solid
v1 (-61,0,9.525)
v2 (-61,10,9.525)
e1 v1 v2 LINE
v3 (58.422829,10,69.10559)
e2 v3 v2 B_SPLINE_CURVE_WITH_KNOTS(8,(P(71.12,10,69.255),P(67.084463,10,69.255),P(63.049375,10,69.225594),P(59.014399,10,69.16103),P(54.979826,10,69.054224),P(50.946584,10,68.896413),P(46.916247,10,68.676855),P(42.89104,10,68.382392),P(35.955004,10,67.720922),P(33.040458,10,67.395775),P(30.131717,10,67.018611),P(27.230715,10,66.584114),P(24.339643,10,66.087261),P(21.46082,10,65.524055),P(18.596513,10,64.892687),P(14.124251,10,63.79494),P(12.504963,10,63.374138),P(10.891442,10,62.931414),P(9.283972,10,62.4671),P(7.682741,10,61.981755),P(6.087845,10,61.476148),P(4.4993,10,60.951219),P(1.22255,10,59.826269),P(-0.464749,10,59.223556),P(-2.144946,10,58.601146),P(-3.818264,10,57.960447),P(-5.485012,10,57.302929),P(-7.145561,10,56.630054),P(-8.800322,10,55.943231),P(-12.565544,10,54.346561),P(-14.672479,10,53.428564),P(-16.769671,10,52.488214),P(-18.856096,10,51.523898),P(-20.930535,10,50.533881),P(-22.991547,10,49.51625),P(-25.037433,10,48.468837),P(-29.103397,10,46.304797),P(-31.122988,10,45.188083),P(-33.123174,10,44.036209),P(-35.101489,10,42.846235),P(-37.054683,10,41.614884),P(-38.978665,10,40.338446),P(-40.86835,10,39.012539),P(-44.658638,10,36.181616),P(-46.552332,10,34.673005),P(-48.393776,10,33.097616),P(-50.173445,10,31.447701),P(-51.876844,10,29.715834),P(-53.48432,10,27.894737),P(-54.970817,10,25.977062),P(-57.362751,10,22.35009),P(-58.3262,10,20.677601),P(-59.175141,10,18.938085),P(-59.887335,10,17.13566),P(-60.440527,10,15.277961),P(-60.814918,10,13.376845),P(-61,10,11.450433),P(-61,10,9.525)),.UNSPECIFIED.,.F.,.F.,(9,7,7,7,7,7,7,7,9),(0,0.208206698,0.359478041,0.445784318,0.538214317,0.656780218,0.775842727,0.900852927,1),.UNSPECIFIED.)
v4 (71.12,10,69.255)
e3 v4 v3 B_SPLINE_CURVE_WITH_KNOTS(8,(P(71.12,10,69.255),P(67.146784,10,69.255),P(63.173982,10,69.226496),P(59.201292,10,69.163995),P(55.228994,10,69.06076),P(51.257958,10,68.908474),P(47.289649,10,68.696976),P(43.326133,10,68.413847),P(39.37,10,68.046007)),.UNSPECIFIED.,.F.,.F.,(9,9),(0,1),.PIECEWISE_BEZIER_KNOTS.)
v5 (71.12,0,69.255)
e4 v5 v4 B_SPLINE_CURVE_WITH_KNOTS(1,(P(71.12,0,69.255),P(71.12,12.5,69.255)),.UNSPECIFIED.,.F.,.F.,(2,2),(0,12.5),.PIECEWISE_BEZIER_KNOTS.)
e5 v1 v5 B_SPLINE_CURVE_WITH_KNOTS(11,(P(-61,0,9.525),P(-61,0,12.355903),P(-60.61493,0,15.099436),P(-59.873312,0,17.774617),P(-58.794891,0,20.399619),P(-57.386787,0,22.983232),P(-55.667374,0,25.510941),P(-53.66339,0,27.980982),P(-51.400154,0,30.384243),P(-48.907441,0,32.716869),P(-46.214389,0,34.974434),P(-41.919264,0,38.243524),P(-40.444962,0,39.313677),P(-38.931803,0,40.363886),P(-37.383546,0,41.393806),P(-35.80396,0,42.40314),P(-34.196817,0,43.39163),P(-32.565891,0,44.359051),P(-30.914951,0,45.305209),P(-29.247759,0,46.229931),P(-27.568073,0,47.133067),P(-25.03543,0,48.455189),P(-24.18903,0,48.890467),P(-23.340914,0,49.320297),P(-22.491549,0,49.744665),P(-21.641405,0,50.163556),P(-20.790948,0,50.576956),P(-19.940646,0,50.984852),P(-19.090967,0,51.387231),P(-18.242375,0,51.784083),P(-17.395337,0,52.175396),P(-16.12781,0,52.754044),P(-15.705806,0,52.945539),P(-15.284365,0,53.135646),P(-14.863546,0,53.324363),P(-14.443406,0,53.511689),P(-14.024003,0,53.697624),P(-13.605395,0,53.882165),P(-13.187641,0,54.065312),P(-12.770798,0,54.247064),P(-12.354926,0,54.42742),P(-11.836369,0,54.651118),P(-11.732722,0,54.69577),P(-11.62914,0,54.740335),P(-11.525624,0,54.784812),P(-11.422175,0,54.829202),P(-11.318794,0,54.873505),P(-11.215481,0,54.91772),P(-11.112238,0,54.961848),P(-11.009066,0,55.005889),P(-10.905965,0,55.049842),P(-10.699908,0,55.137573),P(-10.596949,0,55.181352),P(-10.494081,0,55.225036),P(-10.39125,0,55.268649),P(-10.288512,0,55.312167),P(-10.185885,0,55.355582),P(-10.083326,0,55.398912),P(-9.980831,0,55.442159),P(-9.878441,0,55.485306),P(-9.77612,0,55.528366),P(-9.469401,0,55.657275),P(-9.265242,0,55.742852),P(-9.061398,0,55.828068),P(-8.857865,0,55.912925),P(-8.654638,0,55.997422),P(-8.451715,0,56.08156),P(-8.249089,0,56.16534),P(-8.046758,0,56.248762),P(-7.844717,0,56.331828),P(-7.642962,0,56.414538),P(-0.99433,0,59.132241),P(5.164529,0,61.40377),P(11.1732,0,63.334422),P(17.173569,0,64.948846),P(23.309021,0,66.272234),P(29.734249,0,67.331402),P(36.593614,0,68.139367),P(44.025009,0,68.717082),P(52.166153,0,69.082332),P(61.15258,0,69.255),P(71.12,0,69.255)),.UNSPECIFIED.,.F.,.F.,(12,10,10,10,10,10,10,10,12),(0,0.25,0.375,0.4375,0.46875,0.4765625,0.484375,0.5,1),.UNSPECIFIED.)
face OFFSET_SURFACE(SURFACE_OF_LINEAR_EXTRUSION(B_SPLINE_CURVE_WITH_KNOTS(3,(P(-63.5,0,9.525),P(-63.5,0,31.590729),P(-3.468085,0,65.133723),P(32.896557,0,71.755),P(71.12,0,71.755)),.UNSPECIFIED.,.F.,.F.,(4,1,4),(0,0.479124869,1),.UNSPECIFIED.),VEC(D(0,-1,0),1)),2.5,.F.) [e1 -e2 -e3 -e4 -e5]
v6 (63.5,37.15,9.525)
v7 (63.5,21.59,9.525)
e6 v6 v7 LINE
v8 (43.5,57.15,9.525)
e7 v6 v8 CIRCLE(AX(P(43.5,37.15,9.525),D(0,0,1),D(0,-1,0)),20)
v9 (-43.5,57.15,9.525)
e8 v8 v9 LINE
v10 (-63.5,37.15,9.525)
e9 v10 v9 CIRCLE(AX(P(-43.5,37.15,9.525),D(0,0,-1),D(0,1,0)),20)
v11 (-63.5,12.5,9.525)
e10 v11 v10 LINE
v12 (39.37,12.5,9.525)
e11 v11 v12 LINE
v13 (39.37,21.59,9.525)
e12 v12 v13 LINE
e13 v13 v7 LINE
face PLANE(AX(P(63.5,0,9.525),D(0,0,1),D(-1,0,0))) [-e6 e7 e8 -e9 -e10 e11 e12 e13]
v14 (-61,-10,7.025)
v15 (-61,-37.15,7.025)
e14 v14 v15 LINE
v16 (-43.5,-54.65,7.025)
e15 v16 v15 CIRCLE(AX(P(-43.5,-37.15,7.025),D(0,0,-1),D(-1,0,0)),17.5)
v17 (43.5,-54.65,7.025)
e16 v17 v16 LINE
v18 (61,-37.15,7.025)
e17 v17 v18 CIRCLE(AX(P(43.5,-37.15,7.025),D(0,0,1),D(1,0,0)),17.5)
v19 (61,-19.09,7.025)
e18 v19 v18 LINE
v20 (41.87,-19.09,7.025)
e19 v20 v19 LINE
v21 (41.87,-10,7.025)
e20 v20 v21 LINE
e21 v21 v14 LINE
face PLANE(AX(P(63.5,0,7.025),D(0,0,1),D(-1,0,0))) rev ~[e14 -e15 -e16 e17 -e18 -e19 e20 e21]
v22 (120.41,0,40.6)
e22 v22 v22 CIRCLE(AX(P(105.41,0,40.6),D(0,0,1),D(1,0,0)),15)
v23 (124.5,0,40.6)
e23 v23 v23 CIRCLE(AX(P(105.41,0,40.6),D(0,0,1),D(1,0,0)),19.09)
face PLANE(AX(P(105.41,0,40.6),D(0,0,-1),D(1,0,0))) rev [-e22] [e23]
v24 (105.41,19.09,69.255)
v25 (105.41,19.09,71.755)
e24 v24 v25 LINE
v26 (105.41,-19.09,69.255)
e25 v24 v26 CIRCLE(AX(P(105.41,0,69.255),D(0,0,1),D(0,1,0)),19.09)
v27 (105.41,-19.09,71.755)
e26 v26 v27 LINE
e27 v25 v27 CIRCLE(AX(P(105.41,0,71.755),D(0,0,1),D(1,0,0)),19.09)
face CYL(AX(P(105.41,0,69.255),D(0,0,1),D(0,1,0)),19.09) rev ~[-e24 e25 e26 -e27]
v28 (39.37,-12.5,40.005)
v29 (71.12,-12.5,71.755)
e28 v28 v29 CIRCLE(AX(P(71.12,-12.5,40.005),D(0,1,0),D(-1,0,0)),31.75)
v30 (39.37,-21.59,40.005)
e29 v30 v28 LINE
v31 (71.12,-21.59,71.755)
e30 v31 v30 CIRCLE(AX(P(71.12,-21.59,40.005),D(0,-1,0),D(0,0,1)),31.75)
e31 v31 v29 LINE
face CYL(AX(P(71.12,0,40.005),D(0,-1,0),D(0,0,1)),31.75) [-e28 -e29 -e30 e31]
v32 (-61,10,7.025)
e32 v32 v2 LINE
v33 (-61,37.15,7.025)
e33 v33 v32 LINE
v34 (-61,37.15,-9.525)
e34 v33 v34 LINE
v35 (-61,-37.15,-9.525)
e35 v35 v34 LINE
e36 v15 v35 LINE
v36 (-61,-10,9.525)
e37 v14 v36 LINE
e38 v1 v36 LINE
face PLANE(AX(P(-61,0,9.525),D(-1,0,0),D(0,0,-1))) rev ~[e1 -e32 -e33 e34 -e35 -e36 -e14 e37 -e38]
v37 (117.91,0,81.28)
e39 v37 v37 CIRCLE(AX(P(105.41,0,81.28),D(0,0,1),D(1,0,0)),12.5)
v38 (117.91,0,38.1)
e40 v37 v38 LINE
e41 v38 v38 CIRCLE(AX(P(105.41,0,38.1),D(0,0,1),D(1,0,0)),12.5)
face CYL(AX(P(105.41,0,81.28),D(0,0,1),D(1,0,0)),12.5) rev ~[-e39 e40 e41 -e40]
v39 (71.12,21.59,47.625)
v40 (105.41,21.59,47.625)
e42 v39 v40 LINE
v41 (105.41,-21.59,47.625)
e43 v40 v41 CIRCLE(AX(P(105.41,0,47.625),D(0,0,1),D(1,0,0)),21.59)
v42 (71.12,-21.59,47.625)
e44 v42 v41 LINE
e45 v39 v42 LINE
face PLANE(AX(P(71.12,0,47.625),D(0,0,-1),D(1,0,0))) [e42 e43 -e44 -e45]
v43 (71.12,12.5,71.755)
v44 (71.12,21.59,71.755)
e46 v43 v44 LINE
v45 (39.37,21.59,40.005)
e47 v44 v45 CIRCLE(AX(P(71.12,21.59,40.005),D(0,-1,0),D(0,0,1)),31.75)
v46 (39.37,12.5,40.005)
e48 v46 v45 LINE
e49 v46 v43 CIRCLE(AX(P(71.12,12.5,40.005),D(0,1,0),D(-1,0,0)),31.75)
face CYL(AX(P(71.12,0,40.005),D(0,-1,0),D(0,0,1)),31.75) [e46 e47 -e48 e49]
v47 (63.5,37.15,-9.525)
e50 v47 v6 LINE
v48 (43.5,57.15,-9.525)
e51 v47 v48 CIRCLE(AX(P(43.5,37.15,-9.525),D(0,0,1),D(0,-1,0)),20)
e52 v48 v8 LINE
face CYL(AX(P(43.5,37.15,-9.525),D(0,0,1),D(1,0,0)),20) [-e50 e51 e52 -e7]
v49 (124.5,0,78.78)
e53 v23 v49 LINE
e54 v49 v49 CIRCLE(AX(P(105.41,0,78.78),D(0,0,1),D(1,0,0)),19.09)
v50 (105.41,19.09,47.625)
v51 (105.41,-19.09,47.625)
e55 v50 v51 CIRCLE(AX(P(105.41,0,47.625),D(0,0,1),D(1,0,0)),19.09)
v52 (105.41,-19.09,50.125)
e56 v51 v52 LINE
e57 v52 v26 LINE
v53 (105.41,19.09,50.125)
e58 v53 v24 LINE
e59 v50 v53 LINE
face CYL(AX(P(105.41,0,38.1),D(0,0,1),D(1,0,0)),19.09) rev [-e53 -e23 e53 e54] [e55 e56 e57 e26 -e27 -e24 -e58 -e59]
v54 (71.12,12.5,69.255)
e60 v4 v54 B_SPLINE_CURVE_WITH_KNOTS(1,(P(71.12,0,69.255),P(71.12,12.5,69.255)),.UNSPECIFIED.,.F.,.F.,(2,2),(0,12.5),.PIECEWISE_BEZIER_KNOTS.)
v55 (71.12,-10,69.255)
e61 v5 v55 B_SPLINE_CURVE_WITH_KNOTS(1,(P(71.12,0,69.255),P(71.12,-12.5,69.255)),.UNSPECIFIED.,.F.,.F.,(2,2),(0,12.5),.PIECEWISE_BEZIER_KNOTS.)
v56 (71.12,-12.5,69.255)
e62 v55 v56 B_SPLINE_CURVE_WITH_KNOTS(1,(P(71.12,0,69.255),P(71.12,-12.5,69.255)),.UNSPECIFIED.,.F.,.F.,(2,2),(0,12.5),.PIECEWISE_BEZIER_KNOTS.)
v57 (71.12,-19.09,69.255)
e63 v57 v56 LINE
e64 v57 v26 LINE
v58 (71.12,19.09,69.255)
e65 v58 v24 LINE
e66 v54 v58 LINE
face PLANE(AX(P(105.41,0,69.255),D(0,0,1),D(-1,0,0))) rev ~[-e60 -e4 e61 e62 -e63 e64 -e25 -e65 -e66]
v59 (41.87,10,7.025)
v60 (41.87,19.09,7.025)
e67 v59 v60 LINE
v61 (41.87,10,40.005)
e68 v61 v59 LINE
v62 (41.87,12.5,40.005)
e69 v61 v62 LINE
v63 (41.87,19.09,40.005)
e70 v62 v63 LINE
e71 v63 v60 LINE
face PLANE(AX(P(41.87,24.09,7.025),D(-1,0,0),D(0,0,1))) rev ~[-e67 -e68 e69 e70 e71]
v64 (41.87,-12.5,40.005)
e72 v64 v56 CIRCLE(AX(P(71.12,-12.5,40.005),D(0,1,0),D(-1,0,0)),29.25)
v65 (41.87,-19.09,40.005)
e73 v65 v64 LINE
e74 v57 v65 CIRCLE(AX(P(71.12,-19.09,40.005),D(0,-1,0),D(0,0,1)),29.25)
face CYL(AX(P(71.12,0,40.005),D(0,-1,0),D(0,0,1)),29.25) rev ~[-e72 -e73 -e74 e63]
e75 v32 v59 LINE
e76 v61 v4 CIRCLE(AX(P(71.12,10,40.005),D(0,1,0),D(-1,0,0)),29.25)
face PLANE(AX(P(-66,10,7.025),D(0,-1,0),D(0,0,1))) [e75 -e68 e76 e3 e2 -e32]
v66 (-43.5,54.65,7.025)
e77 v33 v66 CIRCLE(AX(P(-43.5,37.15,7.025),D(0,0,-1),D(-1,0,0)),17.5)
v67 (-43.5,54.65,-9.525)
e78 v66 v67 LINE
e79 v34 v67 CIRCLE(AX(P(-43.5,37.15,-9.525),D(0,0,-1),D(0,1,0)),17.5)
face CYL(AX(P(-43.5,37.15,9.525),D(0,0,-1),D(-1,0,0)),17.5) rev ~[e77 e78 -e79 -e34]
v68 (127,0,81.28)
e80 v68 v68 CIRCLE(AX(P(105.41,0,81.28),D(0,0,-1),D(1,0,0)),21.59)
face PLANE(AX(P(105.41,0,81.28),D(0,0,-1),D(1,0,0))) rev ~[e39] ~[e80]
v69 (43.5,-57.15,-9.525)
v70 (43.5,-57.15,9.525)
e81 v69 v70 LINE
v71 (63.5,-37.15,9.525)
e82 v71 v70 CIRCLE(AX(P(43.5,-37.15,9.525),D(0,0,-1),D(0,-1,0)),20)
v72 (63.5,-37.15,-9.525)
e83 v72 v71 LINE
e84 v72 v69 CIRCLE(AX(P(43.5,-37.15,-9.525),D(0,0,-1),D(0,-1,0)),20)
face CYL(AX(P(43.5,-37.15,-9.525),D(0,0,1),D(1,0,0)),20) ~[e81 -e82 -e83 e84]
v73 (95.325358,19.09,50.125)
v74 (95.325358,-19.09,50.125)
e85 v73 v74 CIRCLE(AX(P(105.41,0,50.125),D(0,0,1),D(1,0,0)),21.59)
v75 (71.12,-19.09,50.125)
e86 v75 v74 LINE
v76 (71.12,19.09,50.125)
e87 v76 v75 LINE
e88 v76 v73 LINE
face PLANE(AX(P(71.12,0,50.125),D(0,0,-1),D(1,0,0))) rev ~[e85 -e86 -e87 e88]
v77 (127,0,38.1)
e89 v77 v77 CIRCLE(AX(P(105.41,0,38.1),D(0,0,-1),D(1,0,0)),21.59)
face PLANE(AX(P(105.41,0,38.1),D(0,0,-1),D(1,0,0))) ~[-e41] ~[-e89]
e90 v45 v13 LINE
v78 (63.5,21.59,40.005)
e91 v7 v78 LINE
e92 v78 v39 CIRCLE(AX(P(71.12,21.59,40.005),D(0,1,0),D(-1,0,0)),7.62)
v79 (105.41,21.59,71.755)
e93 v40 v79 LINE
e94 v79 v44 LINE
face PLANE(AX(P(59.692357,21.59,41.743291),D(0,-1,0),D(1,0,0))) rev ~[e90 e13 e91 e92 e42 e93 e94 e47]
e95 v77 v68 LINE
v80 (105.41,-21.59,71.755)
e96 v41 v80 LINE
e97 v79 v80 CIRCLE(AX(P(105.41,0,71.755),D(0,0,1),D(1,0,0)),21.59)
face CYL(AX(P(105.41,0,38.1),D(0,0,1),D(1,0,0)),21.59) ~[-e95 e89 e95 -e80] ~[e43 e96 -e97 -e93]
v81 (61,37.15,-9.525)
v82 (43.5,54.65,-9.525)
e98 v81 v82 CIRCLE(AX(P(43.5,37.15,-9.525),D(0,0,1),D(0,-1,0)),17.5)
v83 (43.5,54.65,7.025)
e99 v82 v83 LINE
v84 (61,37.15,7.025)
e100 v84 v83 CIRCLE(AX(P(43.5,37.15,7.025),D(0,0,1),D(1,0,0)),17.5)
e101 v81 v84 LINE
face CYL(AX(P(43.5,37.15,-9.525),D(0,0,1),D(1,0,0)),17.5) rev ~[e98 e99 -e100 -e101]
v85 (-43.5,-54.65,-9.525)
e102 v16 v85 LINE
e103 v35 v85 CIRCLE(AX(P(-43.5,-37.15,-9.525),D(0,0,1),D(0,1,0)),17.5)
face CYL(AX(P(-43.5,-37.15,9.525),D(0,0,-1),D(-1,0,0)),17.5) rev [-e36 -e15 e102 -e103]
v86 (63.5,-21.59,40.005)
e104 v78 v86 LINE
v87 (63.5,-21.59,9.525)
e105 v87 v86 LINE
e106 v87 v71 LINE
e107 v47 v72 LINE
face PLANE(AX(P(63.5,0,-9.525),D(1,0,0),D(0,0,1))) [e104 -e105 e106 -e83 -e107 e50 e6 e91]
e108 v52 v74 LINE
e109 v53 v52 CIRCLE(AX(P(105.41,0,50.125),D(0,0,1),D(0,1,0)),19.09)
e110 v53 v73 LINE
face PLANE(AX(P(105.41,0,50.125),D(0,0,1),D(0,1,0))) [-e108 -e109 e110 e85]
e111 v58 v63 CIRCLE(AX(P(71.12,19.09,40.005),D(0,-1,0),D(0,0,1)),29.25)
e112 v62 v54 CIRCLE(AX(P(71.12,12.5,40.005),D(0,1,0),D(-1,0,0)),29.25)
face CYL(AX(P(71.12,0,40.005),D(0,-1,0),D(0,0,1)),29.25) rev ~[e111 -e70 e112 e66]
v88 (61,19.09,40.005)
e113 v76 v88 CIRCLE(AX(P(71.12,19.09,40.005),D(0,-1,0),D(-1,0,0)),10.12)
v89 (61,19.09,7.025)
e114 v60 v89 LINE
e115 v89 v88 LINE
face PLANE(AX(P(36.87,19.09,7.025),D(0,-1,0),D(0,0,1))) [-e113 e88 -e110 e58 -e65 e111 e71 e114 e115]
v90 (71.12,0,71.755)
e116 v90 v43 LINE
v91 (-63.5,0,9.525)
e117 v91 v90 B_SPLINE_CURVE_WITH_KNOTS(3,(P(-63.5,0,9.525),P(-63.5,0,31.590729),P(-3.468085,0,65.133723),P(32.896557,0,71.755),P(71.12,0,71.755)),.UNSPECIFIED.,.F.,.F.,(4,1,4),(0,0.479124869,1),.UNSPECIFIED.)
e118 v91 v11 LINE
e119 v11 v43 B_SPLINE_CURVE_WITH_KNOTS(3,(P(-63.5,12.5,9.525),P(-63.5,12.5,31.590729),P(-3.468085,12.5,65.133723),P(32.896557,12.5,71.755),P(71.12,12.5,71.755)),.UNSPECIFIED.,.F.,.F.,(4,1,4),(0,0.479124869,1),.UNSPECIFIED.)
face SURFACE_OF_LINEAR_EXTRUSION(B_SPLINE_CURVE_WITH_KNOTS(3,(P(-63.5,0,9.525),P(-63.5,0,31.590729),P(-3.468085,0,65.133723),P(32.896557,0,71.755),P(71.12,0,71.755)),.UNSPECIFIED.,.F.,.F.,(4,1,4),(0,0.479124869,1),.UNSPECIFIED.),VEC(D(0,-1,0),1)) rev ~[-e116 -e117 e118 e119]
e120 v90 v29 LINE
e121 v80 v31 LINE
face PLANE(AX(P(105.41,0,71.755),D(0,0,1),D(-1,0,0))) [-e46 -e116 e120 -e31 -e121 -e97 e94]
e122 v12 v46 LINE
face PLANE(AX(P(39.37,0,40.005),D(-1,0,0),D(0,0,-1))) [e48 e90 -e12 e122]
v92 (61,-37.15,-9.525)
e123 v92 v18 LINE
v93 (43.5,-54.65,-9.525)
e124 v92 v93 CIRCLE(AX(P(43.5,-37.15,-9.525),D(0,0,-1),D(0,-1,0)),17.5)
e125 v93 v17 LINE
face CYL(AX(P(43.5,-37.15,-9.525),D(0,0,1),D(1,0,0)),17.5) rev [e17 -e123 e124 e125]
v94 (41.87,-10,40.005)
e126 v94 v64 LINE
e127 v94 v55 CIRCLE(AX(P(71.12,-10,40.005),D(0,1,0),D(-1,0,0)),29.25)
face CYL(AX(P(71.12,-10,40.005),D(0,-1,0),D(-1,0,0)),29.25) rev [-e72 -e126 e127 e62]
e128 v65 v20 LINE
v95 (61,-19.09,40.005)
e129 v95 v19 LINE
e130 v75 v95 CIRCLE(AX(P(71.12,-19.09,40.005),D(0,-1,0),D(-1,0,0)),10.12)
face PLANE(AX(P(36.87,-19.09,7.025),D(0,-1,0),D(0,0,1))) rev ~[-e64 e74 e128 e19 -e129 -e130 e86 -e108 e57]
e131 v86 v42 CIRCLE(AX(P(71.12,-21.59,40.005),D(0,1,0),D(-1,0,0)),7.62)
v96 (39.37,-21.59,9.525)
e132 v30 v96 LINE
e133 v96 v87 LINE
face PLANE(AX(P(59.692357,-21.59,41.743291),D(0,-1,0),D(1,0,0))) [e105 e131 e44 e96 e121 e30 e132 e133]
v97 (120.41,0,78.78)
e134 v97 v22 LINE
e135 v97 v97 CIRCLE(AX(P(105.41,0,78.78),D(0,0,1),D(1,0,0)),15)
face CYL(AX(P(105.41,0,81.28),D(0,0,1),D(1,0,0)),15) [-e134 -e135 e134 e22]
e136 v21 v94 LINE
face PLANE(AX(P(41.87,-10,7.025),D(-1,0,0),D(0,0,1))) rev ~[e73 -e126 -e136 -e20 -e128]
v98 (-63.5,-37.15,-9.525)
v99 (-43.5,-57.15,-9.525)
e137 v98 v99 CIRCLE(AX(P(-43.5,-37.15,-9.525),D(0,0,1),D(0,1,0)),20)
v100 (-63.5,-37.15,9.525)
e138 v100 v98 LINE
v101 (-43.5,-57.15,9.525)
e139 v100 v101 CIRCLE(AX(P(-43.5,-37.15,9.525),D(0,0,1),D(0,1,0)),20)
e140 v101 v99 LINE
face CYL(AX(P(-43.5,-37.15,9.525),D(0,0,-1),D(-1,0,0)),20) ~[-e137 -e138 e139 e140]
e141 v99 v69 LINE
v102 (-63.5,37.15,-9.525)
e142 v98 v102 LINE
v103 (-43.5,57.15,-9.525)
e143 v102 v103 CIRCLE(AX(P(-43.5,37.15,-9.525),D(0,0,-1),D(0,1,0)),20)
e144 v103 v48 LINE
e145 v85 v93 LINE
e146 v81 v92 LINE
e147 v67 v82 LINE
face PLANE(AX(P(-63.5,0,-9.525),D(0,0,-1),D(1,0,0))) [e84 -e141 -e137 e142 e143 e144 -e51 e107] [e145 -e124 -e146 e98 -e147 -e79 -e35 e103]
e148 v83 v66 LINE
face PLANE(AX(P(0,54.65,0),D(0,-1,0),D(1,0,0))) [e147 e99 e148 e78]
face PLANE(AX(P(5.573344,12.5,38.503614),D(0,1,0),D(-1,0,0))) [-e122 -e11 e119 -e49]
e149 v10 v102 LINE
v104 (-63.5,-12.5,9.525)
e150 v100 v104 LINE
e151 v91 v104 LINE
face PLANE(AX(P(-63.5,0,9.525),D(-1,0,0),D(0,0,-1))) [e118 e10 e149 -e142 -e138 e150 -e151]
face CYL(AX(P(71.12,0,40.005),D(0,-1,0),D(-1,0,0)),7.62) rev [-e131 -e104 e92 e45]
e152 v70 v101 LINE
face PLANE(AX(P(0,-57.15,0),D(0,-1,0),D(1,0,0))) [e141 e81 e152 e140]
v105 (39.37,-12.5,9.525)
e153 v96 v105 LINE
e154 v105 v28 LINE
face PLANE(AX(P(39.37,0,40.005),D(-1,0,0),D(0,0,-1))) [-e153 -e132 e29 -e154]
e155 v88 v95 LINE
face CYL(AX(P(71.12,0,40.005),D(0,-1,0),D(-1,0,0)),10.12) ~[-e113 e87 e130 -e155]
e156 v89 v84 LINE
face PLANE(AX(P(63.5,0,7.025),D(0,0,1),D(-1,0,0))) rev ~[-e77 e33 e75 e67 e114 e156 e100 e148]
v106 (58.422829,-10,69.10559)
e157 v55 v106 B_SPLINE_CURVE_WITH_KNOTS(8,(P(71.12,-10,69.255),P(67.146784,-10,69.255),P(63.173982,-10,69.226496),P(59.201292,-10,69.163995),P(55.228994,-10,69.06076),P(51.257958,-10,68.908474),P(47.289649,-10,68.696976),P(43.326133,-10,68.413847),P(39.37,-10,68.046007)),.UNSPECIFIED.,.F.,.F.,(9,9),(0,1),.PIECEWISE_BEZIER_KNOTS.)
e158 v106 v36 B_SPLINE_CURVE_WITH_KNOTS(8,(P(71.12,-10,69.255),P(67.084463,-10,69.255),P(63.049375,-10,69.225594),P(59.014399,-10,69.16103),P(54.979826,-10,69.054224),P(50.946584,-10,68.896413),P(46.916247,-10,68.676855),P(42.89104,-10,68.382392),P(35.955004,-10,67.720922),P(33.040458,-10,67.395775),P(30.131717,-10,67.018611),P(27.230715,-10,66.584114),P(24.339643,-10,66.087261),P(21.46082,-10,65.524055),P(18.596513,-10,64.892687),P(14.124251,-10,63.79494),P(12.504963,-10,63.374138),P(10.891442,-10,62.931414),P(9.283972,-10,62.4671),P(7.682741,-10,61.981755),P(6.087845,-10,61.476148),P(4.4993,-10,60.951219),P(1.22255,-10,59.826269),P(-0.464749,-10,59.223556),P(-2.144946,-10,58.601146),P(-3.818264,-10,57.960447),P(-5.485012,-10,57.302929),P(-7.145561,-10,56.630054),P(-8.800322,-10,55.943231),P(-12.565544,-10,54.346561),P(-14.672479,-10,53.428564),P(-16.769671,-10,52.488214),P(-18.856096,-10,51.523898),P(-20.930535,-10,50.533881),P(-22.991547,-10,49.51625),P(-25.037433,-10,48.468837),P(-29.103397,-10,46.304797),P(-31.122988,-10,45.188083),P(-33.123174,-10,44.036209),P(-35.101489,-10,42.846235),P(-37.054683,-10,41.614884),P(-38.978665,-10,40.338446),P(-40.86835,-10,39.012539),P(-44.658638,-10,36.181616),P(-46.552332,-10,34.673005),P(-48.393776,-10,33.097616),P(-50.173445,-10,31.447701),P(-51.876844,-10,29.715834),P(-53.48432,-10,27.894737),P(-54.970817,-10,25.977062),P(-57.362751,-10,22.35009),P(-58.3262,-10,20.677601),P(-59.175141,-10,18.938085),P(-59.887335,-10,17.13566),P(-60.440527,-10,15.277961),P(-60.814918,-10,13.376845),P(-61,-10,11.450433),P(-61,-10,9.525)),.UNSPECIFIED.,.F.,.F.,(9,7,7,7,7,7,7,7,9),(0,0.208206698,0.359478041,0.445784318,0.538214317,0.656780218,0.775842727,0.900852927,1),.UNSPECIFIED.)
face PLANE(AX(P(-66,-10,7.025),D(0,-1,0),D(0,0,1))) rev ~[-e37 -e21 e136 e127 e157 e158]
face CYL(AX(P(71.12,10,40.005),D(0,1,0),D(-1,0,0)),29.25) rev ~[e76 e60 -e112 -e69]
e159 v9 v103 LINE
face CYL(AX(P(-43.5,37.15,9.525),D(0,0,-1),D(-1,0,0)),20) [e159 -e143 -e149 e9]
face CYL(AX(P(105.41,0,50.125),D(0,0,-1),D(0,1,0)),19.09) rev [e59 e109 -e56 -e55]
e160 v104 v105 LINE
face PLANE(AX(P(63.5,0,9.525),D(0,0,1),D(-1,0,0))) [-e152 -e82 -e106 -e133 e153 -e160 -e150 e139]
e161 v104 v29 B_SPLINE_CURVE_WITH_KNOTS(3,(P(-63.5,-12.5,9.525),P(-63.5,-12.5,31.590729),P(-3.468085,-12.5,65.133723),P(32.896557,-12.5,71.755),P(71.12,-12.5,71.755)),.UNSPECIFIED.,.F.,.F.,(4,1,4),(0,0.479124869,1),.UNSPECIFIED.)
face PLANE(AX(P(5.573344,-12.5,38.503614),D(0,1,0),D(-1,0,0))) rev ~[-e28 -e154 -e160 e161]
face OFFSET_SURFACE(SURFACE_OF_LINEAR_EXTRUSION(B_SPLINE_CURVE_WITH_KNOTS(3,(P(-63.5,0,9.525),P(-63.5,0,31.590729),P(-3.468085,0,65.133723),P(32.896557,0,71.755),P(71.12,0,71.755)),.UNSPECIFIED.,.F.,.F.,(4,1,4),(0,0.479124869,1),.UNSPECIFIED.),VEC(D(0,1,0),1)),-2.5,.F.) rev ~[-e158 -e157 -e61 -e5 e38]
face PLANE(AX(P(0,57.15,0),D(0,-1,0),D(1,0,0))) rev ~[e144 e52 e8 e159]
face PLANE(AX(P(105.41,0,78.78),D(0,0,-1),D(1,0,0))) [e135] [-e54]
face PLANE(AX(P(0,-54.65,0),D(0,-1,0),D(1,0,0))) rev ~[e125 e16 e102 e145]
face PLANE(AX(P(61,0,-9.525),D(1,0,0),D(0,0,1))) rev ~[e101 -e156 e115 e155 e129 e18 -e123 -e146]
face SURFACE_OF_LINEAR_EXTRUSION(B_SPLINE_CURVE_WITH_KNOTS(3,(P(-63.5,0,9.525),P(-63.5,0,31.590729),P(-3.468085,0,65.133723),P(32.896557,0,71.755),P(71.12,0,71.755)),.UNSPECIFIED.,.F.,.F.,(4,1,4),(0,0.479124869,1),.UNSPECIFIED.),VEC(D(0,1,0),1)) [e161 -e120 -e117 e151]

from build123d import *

# Parameters (mm, degrees)
F1_DEPTH     = 57.15
F0_W         = 21.59
F0_H         = 24.13
F2_DEPTH     = 21.59
F3_DEPTH     = 12.5
F5_R         = 12.5
F6_DEPTH     = 90.806
F7_R         = 20
F8_T         = 2.5
F8_T3_DEPTH  = 107.87
F8_T5_DEPTH  = 14.09
F8_T7_DEPTH  = 29.13
F8_T9_DEPTH  = 14.09
F8_T11_DEPTH = 35.48
F8_T14_ANGLE = 90.000000001
F8_T16_ANGLE = 90.000000001
F8_T18_ANGLE = 180.000000001
F8_T20_ANGLE = 180.000000001


# Not quite as in the source:
# - a shell that OpenCascade refuses in one call is made with other operations: the cavity is built on its own and cut out


with BuildPart() as f1:
    # F0 (on Front) → F1 (new body, symmetric)
    with BuildSketch(Plane.XZ):
        Polygon((-63.5, -9.525), (63.5, -9.525), (63.5, 9.525), (39.37, 9.525), (-63.5, 9.525), align=None)
    extrude(amount=F1_DEPTH, both=True)

    # F0 (on Front) → F2 (join, symmetric)
    with BuildSketch(Plane.XZ):
        with BuildLine():
            Line((39.37, 9.525), (63.5, 9.525))
            Line((63.5, 9.525), (63.5, 40.005))
            ThreePointArc((63.5, 40.005), (65.7318463274, 45.3931536726), (71.12, 47.625))
            Line((71.12, 47.625), (83.82, 47.625))
            Line((83.82, 47.625), (83.82, 71.755))
            Line((83.82, 71.755), (71.12, 71.755))
            ThreePointArc((71.12, 71.755), (48.6693596973, 62.4556403027), (39.37, 40.005))
            Line((39.37, 40.005), (39.37, 9.525))
        make_face()
        with Locations((94.615, 59.69)):
            Rectangle(F0_W, F0_H)
    extrude(amount=F2_DEPTH, both=True)

    # F0 (on Front) → F3 (join, symmetric)
    with BuildSketch(Plane.XZ):
        with BuildLine():
            add(Edge.make_bspline(
                [(-63.5, 9.525), (-63.5, 31.5907289062), (-3.4680848518, 65.1337229979), (32.8965573805, 71.755), (71.12, 71.755)],
                knots=[0, 0, 0, 0, 0.4791248693, 1, 1, 1, 1], degree=3))
            Line((-63.5, 9.525), (39.37, 9.525))
            Line((39.37, 9.525), (39.37, 40.005))
            ThreePointArc((39.37, 40.005), (48.6693596973, 62.4556403027), (71.12, 71.755))
        make_face()
    extrude(amount=F3_DEPTH, both=True)

    # F0 (on Front) → F4 (revolve)
    with BuildSketch(Plane.XZ):
        Polygon((105.41, 81.28), (105.41, 71.755), (105.41, 47.625), (105.41, 38.1), (127, 38.1), (127, 81.28), align=None)
    revolve(axis=Axis((105.41, 0, 59.69), (0, 0, -1)))

    # F5 (on face) → F6 (cut, through all)
    with BuildSketch(Plane.XY.offset(81.28)):
        with Locations((105.41, 0)):
            Circle(F5_R)
    extrude(amount=-F6_DEPTH, mode=Mode.SUBTRACT)

    # F7
    f7_edges = [f1.edges().sort_by_distance(p)[0] for p in [
        (63.5, -57.15, 0),
        (-63.5, -57.15, 0),
        (63.5, 57.15, 0),
        (-63.5, 57.15, 0),
    ]]
    fillet(f7_edges, radius=F7_R)

    # F8: shell of thickness 2.5, made by hand


with BuildPart() as f8_core1:
    # F8_t2: copy of F1
    add(f1.part)

    # the walls: a layer under each face that stays
    f8_faces = [f8_core1.faces().sort_by_distance(p)[0] for p in [
        (0, 57.15, 0),
        (-57.6421356237, 51.2921356237, 0),
        (57.6421356237, 51.2921356237, 0),
        (-63.5, 0, 0),
        (63.5, 0, 15.24),
        (-57.6421356237, -51.2921356237, 0),
        (57.6421356237, -51.2921356237, 0),
        (0, -57.15, 0),
        (0, 34.825, 9.525),
        (0, -34.825, 9.525),
        (-8.3874166975, -6.25, 58.8110273922),
        (-8.3874166975, 6.25, 58.8110273922),
        (50.3766666667, 21.59, 19.8966666667),
        (50.3766666667, -21.59, 19.8966666667),
        (65.7318463274, 0, 45.3931536726),
        (3.81, 12.5, 40.64),
        (39.37, 17.045, 24.765),
        (3.81, -12.5, 40.64),
        (39.37, -17.045, 24.765),
        (88.265, 14.3933333333, 71.755),
        (76.835, 14.3933333333, 47.625),
        (116.205, -18.6974884677, 45.2966666667),
        (48.6693596973, 17.045, 62.4556403027),
        (48.6693596973, -17.045, 62.4556403027),
        (91.0166666667, 14.3933333333, 81.28),
        (119.8033333333, 14.3933333333, 38.1),
        (92.91, 0, 59.69),
    ]]
    thicken(f8_faces, amount=-F8_T, mode=Mode.SUBTRACT)

    # F8_s4 → F8_t3 (cut)
    with BuildSketch(Plane.YZ.offset(-66)):
        Polygon((12.525, 9.55), (12.5, 7.025), (10, 7.025), (10, 9.525), align=None)
        Polygon((-12.525, 9.55), (-12.5, 7.025), (-10, 7.025), (-10, 9.525), align=None)
    extrude(amount=F8_T3_DEPTH, mode=Mode.SUBTRACT)

    # F8_s6 → F8_t5 (cut)
    with BuildSketch(Plane.XZ.offset(-24.09)):
        Polygon((39.345, 9.55), (39.37, 7.025), (41.87, 7.025), (41.87, 9.525), align=None)
    extrude(amount=F8_T5_DEPTH, mode=Mode.SUBTRACT)

    # F8_s8 → F8_t7 (cut)
    with BuildSketch(Plane.YZ.offset(36.87)):
        Polygon((21.615, 9.55), (21.59, 7.025), (19.09, 7.025), (19.09, 9.525), align=None)
        Polygon((-21.615, 9.55), (-21.59, 7.025), (-19.09, 7.025), (-19.09, 9.525), align=None)
    extrude(amount=F8_T7_DEPTH, mode=Mode.SUBTRACT)

    # F8_s10 → F8_t9 (cut)
    with BuildSketch(Plane.XZ.offset(10)):
        Polygon((39.345, 9.55), (39.37, 7.025), (41.87, 7.025), (41.87, 9.525), align=None)
    extrude(amount=F8_T9_DEPTH, mode=Mode.SUBTRACT)

    # F8_s12 → F8_t11 (cut)
    with BuildSketch(Plane.XY.offset(7.025)):
        Polygon((39.345, 12.525), (39.37, 10), (41.87, 10), (41.87, 12.5), align=None)
        Polygon((39.345, -12.525), (39.37, -10), (41.87, -10), (41.87, -12.5), align=None)
    extrude(amount=F8_T11_DEPTH, mode=Mode.SUBTRACT)

    # F8_s13 → F8_t14 (revolve, cut)
    with BuildSketch(Plane.XY.offset(40.005)):
        Polygon((39.345, 12.525), (39.37, 10), (41.87, 10), (41.87, 12.5), align=None)
    revolve(axis=Axis((71.12, 12.5, 40.005), (0, 1, 0)), revolution_arc=F8_T14_ANGLE, mode=Mode.SUBTRACT)

    # F8_s15 → F8_t16 (revolve, cut)
    with BuildSketch(Plane.XY.offset(40.005)):
        Polygon((39.345, -12.525), (39.37, -10), (41.87, -10), (41.87, -12.5), align=None)
    revolve(axis=Axis((71.12, -12.5, 40.005), (0, 1, 0)), revolution_arc=F8_T16_ANGLE, mode=Mode.SUBTRACT)

    # F8_s17 → F8_t18 (revolve, cut)
    with BuildSketch(Plane.YZ.offset(105.41)):
        Polygon((21.615, 71.78), (21.59, 69.255), (19.09, 69.255), (19.09, 71.755), align=None)
    revolve(axis=Axis((105.41, 0, 71.755), (0, 0, 1)), revolution_arc=F8_T18_ANGLE, mode=Mode.SUBTRACT)

    # F8_s19 → F8_t20 (revolve, cut)
    with BuildSketch(Plane.YZ.offset(105.41)):
        Polygon((21.615, 47.6), (21.59, 50.125), (19.09, 50.125), (19.09, 47.625), align=None)
    revolve(axis=Axis((105.41, 0, 47.625), (0, 0, 1)), revolution_arc=F8_T20_ANGLE, mode=Mode.SUBTRACT)


with BuildPart() as f1_1:
    add(f1.part)

    # what is left inside the walls is the cavity
    f8_cavity = [f8_core1.part.solids().sort_by_distance(p)[0] for p in [
        (0, 18.216667, -9.5),
    ]]
    add(f8_cavity, mode=Mode.SUBTRACT)


solid = f1_1.part
